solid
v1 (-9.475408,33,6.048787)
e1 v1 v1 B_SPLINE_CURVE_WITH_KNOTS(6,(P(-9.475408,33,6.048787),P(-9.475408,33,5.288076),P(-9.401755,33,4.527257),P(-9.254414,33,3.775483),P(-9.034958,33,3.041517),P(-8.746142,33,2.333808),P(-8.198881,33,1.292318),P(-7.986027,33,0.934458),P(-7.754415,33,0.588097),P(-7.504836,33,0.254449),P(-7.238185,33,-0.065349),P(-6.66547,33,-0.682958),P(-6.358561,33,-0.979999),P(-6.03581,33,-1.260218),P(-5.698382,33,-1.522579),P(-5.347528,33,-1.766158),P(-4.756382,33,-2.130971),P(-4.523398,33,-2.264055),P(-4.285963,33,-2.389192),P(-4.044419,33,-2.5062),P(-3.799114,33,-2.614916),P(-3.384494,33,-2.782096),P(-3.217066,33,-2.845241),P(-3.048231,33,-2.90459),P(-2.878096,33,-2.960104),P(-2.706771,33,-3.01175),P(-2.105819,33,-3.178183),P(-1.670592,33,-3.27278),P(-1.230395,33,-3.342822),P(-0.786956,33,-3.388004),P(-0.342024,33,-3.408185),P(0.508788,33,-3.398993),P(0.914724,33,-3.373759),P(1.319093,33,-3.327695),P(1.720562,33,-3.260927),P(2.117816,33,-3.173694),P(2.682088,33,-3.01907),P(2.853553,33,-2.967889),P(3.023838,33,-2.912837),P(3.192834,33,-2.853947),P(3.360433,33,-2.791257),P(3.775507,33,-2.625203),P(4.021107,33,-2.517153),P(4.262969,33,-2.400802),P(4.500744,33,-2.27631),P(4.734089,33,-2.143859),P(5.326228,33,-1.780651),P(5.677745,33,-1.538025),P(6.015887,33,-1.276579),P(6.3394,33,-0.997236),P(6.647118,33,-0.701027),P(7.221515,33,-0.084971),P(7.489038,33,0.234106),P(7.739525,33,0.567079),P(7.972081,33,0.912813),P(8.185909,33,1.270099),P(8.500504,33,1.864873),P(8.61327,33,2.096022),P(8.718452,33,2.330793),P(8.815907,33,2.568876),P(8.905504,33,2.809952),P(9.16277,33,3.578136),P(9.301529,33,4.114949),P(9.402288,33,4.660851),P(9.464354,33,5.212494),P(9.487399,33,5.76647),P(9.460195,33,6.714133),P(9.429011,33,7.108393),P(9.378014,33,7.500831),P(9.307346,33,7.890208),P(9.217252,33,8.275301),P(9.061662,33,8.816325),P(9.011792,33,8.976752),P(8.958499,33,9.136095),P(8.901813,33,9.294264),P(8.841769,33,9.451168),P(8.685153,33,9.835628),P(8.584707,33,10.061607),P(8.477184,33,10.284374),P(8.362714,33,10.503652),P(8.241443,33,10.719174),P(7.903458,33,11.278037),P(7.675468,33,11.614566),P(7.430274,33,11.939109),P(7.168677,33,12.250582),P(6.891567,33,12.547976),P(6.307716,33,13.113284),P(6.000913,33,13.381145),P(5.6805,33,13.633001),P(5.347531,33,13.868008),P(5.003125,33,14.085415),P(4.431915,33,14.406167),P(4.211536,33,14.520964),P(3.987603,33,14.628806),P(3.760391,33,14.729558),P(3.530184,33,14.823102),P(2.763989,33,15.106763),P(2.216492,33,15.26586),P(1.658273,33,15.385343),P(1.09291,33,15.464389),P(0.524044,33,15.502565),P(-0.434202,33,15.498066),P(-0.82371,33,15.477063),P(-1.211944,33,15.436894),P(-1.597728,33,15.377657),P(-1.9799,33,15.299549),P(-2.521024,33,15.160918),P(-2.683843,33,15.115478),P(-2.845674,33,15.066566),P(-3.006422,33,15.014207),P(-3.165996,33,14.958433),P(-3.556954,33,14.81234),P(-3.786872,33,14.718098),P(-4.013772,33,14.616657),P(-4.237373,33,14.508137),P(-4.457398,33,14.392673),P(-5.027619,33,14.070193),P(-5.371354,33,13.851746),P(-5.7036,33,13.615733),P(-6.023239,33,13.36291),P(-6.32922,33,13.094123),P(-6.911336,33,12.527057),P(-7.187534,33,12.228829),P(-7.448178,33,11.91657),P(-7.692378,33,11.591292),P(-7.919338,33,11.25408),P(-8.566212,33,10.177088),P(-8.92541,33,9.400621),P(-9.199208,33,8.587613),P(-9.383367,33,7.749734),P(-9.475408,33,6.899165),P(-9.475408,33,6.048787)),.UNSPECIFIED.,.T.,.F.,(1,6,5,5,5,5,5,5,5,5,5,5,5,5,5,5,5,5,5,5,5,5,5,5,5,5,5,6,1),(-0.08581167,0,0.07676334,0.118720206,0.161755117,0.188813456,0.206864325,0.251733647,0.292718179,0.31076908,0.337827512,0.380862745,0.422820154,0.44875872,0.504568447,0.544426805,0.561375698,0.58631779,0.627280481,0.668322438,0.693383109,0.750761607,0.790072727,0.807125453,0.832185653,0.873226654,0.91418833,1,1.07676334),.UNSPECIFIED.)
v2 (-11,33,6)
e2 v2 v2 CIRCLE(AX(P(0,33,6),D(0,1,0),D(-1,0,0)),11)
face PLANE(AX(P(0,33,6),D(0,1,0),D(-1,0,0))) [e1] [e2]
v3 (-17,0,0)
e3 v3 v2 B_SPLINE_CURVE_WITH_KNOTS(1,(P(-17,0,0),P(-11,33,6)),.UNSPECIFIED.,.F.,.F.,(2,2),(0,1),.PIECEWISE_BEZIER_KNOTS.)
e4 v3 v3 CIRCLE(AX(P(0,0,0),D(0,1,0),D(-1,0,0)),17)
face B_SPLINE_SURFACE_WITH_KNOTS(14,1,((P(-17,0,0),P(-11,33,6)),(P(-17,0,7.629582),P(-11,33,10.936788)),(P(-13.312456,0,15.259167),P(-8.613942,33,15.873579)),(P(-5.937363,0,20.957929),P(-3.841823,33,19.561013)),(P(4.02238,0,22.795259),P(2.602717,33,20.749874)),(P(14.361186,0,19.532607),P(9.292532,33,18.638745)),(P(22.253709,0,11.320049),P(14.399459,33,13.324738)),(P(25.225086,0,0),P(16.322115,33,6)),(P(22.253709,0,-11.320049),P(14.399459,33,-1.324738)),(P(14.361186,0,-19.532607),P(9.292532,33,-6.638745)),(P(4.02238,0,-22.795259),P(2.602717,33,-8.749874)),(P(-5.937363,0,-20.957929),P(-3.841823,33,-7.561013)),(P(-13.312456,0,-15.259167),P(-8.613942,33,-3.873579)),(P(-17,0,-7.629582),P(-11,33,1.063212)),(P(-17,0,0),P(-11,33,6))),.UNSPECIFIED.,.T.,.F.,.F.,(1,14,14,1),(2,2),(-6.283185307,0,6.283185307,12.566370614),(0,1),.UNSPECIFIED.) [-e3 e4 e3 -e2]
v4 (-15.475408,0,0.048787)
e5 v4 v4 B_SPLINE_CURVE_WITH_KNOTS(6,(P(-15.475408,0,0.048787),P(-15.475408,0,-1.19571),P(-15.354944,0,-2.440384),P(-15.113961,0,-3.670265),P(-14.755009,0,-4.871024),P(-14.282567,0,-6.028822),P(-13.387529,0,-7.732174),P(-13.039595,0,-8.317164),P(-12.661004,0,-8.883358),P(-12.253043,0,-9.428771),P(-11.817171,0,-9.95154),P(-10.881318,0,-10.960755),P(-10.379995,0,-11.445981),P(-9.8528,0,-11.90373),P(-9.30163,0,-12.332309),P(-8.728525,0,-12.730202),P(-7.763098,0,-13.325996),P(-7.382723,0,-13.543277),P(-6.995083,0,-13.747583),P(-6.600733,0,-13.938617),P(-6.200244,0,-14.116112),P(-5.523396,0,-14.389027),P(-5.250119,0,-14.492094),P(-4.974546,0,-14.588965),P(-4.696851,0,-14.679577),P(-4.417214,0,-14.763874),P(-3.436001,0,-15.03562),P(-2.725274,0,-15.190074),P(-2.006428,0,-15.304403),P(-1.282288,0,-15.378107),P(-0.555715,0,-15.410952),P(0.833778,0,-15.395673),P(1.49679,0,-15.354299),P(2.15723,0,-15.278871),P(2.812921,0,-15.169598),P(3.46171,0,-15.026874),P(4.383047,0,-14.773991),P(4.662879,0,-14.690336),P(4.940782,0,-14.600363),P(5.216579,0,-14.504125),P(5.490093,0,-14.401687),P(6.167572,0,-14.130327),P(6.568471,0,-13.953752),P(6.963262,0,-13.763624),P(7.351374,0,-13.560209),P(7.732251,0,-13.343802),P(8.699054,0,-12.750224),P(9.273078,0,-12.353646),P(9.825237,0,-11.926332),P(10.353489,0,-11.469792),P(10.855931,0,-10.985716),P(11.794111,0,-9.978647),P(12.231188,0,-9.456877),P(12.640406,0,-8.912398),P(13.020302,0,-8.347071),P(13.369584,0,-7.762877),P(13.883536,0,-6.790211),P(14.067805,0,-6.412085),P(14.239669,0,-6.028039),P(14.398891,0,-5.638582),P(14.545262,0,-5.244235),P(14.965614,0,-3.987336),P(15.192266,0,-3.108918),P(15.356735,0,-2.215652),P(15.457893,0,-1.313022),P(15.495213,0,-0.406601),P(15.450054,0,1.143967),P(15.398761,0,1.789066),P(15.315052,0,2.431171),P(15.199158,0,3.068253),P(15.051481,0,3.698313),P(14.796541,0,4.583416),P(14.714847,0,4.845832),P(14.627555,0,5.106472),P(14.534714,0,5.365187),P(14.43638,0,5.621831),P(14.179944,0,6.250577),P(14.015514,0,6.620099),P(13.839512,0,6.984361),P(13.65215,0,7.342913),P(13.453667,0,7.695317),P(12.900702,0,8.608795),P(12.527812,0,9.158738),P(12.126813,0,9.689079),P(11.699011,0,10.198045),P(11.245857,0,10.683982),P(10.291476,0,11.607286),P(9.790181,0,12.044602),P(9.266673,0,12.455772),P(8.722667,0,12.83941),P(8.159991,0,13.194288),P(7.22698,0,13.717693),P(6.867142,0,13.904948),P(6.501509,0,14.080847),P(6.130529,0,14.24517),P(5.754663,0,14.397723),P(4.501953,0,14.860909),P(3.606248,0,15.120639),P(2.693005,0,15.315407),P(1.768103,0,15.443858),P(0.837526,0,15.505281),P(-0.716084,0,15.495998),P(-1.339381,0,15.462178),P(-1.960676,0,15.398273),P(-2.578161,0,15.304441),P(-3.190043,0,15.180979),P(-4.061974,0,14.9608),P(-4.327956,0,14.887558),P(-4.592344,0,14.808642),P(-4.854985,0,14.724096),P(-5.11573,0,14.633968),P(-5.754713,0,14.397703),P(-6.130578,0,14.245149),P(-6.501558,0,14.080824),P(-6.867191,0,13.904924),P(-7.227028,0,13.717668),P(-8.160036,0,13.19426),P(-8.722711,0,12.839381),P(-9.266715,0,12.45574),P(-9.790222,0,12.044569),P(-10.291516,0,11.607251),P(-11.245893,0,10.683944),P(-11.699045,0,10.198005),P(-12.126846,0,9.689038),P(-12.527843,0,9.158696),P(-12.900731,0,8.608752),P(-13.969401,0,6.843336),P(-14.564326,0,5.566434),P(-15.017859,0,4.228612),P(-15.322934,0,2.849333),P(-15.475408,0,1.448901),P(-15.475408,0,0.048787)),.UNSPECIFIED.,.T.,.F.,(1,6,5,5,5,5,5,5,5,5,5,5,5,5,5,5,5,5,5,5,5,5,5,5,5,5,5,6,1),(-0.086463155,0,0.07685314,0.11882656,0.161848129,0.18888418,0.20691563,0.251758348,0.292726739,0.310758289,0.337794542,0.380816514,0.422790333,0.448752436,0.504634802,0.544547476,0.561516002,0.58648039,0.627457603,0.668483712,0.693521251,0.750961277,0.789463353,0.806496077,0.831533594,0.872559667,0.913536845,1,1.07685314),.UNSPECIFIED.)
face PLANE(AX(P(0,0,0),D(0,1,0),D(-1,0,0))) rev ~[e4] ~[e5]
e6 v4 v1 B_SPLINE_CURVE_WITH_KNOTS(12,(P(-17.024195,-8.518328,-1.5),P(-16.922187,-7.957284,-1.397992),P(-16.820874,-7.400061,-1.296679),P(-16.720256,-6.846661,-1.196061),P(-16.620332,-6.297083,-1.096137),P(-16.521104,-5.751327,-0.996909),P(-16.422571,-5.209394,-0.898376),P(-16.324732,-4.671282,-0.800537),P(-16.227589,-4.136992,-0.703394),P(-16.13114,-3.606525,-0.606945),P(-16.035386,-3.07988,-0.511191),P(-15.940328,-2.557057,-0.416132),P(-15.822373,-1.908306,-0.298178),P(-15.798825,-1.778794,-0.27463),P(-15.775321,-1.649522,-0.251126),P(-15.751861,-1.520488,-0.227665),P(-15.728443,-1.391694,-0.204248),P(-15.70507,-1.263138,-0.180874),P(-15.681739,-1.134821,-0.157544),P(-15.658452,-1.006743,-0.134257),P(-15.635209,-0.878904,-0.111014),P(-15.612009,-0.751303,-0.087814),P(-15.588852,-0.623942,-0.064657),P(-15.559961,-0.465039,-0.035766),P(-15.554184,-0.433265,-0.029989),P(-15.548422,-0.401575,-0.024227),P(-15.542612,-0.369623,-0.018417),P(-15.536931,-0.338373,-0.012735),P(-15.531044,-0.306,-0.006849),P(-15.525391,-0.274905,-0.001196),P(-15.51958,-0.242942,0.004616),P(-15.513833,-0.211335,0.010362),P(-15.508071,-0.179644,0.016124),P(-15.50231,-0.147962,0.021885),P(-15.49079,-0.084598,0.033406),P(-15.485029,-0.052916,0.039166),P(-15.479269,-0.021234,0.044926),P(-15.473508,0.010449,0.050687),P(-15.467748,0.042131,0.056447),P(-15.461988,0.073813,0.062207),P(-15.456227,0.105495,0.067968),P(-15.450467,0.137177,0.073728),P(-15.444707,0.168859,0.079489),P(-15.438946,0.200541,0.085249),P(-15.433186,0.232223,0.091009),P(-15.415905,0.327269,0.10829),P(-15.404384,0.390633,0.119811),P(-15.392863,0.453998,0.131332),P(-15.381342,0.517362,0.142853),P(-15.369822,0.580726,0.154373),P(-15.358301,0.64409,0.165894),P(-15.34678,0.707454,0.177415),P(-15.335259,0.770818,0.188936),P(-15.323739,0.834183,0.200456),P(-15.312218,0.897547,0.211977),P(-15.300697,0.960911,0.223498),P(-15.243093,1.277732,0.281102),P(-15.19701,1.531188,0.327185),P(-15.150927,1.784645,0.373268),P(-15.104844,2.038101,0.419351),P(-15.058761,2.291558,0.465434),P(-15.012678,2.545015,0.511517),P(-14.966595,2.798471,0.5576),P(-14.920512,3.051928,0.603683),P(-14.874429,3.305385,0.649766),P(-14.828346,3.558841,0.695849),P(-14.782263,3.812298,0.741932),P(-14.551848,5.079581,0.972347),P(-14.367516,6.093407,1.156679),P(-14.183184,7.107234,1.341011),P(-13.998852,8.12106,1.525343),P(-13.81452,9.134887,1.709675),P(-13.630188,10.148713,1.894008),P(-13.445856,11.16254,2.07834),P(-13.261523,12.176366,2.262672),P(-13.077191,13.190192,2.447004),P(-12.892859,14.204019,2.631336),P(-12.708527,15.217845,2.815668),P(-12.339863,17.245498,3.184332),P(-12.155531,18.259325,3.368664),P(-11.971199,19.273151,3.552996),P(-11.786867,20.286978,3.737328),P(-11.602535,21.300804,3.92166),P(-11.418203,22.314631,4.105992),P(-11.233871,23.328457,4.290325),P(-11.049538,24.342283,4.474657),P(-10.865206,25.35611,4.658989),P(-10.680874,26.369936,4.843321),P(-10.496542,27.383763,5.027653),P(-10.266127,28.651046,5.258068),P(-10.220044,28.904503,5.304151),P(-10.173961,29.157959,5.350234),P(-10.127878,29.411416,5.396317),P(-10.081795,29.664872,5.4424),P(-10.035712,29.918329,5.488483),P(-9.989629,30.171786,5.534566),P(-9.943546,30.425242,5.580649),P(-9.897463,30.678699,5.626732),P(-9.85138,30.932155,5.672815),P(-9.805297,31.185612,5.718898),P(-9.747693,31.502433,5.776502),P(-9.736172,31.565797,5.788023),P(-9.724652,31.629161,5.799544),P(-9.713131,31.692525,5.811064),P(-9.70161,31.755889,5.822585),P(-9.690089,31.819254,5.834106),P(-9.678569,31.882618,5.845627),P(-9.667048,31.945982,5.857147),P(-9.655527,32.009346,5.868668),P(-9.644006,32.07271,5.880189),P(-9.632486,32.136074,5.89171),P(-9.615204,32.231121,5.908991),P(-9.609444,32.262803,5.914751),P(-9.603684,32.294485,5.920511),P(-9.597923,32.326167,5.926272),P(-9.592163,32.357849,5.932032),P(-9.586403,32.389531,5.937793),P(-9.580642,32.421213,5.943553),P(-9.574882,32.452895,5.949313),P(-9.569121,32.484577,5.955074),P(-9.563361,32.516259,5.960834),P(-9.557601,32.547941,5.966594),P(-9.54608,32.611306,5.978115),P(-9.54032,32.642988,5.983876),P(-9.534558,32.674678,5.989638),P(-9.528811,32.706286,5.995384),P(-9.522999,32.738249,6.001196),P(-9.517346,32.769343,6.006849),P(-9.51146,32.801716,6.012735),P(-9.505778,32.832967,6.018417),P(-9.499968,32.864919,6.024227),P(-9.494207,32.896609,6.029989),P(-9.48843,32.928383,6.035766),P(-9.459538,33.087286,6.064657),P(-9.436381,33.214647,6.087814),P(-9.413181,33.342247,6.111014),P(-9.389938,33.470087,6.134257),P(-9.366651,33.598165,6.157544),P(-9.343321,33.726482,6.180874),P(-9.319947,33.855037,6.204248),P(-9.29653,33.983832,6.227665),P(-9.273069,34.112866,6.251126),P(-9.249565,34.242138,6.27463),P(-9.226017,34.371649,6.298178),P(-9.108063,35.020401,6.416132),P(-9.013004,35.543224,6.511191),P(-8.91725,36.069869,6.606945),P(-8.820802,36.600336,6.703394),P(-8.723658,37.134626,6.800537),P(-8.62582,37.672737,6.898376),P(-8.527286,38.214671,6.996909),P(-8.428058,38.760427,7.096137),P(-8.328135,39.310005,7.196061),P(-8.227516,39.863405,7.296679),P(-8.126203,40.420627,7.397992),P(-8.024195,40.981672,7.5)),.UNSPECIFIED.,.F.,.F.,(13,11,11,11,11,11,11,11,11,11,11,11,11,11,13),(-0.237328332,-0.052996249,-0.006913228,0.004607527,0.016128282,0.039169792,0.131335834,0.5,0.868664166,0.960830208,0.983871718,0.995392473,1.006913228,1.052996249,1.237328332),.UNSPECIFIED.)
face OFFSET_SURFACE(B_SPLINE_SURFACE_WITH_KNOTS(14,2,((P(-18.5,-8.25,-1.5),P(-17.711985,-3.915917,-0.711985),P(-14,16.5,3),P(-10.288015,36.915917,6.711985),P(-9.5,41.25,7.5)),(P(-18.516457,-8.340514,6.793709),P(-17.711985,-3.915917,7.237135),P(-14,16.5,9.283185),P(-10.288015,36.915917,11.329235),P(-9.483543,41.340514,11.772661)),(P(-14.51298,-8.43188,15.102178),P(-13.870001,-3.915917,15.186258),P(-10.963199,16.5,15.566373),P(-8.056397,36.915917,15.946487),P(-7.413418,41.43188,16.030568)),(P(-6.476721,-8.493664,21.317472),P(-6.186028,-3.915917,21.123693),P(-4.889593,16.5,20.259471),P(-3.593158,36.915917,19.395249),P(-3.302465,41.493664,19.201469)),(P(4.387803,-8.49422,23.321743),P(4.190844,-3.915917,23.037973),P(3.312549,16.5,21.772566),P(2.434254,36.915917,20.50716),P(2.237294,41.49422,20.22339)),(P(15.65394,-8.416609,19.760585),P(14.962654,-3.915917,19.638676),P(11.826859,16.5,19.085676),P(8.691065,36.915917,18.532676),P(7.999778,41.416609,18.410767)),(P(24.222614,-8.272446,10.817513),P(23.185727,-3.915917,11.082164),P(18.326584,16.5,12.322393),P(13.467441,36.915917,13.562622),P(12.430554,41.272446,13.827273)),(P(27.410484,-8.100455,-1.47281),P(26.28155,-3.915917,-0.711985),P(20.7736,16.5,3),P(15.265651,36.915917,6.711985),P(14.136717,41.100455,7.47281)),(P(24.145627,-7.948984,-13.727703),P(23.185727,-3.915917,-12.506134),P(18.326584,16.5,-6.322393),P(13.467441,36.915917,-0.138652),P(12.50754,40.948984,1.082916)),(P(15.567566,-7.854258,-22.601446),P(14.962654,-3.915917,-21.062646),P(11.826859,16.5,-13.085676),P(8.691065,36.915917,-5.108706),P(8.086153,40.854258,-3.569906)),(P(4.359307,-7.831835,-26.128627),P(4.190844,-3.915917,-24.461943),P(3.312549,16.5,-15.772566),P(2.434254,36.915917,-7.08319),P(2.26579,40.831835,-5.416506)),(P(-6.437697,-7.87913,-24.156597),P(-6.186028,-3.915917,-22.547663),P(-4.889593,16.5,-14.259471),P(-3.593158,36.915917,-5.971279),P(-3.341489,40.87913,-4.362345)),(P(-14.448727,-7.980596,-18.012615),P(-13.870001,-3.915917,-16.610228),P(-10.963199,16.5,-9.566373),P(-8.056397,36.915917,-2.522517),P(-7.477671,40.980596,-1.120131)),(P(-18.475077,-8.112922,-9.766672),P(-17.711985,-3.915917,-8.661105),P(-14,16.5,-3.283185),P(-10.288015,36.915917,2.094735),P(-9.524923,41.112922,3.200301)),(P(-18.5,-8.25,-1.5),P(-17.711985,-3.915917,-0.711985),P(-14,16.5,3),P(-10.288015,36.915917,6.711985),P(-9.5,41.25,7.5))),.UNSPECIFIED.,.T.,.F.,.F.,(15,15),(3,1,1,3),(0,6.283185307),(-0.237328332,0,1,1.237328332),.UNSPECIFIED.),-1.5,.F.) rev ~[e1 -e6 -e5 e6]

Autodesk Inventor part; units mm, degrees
ref_plane "YZ Plane" through (0, 0, 0) normal (1, 0, 0) x (0, 1, 0)
ref_plane "XY Plane" through (0, 0, 0) normal (0, 0, 1) x (1, 0, 0)
sketch "Szkic6" plane through (0, 0, 0) normal (0, 1, 0) x (-1, 0, 0)
  circle A0 centre (0, 0) radius 17
  dimension "d33" = 34
ref_plane "Płaszczyzna konstrukcyjna1" through (0, 33, 0) normal (0, 1, 0) x (-1, 0, 0)
sketch "Szkic7" plane through (0, 33, 0) normal (0, 1, 0) x (-1, 0, 0)
  circle A0 centre (0, 6) radius 11
  line L0 (0, -20.3) -> (0, 20.3) construction
  circle A1 centre (0, 0) radius 17 construction
  dimension "d35" = 22
loft "Wyciągnięcie złożone1" add profiles "Szkic6", "Szkic7"
shell "Skorupa1" thickness 1.5 removed faces 2 at (-1.2575, 33, -0.9489) at (6.0401, 0, -5.7878)
equation "\"d33\" = OD1"
equation "\"d35\" = OD2"
equation "\"d52\" = THK"
equation "\"SzerokośćGięciaPodcięcia\" = Grubość"
equation "\"RozmiarPodcięciaNarożnika\" = 4 * Grubość"
equation "\"PromieńPrzejścia\" = PromieńGięcia"
equation "\"Rozmiar_promienia_Jacobiego\" = PromieńGięcia"
equation "\"Wielk_odstępu\" = Grubość"
equation "\"d2\" = PromieńGięcia"
equation "\"d23\" = PromieńGięcia"
equation "\"OD1\" = 34"
equation "\"OD2\" = 22"
equation "\"L\" = 33"
equation "\"THK\" = 1.5"
equation "\"d34\" = L"
equation "\"Grubość\" = 1.5"
equation "\"PromieńGięcia\" = 3"
properties part number "Redukcja asymetryczna Ø34x22x1,5 L=33" material "304"
